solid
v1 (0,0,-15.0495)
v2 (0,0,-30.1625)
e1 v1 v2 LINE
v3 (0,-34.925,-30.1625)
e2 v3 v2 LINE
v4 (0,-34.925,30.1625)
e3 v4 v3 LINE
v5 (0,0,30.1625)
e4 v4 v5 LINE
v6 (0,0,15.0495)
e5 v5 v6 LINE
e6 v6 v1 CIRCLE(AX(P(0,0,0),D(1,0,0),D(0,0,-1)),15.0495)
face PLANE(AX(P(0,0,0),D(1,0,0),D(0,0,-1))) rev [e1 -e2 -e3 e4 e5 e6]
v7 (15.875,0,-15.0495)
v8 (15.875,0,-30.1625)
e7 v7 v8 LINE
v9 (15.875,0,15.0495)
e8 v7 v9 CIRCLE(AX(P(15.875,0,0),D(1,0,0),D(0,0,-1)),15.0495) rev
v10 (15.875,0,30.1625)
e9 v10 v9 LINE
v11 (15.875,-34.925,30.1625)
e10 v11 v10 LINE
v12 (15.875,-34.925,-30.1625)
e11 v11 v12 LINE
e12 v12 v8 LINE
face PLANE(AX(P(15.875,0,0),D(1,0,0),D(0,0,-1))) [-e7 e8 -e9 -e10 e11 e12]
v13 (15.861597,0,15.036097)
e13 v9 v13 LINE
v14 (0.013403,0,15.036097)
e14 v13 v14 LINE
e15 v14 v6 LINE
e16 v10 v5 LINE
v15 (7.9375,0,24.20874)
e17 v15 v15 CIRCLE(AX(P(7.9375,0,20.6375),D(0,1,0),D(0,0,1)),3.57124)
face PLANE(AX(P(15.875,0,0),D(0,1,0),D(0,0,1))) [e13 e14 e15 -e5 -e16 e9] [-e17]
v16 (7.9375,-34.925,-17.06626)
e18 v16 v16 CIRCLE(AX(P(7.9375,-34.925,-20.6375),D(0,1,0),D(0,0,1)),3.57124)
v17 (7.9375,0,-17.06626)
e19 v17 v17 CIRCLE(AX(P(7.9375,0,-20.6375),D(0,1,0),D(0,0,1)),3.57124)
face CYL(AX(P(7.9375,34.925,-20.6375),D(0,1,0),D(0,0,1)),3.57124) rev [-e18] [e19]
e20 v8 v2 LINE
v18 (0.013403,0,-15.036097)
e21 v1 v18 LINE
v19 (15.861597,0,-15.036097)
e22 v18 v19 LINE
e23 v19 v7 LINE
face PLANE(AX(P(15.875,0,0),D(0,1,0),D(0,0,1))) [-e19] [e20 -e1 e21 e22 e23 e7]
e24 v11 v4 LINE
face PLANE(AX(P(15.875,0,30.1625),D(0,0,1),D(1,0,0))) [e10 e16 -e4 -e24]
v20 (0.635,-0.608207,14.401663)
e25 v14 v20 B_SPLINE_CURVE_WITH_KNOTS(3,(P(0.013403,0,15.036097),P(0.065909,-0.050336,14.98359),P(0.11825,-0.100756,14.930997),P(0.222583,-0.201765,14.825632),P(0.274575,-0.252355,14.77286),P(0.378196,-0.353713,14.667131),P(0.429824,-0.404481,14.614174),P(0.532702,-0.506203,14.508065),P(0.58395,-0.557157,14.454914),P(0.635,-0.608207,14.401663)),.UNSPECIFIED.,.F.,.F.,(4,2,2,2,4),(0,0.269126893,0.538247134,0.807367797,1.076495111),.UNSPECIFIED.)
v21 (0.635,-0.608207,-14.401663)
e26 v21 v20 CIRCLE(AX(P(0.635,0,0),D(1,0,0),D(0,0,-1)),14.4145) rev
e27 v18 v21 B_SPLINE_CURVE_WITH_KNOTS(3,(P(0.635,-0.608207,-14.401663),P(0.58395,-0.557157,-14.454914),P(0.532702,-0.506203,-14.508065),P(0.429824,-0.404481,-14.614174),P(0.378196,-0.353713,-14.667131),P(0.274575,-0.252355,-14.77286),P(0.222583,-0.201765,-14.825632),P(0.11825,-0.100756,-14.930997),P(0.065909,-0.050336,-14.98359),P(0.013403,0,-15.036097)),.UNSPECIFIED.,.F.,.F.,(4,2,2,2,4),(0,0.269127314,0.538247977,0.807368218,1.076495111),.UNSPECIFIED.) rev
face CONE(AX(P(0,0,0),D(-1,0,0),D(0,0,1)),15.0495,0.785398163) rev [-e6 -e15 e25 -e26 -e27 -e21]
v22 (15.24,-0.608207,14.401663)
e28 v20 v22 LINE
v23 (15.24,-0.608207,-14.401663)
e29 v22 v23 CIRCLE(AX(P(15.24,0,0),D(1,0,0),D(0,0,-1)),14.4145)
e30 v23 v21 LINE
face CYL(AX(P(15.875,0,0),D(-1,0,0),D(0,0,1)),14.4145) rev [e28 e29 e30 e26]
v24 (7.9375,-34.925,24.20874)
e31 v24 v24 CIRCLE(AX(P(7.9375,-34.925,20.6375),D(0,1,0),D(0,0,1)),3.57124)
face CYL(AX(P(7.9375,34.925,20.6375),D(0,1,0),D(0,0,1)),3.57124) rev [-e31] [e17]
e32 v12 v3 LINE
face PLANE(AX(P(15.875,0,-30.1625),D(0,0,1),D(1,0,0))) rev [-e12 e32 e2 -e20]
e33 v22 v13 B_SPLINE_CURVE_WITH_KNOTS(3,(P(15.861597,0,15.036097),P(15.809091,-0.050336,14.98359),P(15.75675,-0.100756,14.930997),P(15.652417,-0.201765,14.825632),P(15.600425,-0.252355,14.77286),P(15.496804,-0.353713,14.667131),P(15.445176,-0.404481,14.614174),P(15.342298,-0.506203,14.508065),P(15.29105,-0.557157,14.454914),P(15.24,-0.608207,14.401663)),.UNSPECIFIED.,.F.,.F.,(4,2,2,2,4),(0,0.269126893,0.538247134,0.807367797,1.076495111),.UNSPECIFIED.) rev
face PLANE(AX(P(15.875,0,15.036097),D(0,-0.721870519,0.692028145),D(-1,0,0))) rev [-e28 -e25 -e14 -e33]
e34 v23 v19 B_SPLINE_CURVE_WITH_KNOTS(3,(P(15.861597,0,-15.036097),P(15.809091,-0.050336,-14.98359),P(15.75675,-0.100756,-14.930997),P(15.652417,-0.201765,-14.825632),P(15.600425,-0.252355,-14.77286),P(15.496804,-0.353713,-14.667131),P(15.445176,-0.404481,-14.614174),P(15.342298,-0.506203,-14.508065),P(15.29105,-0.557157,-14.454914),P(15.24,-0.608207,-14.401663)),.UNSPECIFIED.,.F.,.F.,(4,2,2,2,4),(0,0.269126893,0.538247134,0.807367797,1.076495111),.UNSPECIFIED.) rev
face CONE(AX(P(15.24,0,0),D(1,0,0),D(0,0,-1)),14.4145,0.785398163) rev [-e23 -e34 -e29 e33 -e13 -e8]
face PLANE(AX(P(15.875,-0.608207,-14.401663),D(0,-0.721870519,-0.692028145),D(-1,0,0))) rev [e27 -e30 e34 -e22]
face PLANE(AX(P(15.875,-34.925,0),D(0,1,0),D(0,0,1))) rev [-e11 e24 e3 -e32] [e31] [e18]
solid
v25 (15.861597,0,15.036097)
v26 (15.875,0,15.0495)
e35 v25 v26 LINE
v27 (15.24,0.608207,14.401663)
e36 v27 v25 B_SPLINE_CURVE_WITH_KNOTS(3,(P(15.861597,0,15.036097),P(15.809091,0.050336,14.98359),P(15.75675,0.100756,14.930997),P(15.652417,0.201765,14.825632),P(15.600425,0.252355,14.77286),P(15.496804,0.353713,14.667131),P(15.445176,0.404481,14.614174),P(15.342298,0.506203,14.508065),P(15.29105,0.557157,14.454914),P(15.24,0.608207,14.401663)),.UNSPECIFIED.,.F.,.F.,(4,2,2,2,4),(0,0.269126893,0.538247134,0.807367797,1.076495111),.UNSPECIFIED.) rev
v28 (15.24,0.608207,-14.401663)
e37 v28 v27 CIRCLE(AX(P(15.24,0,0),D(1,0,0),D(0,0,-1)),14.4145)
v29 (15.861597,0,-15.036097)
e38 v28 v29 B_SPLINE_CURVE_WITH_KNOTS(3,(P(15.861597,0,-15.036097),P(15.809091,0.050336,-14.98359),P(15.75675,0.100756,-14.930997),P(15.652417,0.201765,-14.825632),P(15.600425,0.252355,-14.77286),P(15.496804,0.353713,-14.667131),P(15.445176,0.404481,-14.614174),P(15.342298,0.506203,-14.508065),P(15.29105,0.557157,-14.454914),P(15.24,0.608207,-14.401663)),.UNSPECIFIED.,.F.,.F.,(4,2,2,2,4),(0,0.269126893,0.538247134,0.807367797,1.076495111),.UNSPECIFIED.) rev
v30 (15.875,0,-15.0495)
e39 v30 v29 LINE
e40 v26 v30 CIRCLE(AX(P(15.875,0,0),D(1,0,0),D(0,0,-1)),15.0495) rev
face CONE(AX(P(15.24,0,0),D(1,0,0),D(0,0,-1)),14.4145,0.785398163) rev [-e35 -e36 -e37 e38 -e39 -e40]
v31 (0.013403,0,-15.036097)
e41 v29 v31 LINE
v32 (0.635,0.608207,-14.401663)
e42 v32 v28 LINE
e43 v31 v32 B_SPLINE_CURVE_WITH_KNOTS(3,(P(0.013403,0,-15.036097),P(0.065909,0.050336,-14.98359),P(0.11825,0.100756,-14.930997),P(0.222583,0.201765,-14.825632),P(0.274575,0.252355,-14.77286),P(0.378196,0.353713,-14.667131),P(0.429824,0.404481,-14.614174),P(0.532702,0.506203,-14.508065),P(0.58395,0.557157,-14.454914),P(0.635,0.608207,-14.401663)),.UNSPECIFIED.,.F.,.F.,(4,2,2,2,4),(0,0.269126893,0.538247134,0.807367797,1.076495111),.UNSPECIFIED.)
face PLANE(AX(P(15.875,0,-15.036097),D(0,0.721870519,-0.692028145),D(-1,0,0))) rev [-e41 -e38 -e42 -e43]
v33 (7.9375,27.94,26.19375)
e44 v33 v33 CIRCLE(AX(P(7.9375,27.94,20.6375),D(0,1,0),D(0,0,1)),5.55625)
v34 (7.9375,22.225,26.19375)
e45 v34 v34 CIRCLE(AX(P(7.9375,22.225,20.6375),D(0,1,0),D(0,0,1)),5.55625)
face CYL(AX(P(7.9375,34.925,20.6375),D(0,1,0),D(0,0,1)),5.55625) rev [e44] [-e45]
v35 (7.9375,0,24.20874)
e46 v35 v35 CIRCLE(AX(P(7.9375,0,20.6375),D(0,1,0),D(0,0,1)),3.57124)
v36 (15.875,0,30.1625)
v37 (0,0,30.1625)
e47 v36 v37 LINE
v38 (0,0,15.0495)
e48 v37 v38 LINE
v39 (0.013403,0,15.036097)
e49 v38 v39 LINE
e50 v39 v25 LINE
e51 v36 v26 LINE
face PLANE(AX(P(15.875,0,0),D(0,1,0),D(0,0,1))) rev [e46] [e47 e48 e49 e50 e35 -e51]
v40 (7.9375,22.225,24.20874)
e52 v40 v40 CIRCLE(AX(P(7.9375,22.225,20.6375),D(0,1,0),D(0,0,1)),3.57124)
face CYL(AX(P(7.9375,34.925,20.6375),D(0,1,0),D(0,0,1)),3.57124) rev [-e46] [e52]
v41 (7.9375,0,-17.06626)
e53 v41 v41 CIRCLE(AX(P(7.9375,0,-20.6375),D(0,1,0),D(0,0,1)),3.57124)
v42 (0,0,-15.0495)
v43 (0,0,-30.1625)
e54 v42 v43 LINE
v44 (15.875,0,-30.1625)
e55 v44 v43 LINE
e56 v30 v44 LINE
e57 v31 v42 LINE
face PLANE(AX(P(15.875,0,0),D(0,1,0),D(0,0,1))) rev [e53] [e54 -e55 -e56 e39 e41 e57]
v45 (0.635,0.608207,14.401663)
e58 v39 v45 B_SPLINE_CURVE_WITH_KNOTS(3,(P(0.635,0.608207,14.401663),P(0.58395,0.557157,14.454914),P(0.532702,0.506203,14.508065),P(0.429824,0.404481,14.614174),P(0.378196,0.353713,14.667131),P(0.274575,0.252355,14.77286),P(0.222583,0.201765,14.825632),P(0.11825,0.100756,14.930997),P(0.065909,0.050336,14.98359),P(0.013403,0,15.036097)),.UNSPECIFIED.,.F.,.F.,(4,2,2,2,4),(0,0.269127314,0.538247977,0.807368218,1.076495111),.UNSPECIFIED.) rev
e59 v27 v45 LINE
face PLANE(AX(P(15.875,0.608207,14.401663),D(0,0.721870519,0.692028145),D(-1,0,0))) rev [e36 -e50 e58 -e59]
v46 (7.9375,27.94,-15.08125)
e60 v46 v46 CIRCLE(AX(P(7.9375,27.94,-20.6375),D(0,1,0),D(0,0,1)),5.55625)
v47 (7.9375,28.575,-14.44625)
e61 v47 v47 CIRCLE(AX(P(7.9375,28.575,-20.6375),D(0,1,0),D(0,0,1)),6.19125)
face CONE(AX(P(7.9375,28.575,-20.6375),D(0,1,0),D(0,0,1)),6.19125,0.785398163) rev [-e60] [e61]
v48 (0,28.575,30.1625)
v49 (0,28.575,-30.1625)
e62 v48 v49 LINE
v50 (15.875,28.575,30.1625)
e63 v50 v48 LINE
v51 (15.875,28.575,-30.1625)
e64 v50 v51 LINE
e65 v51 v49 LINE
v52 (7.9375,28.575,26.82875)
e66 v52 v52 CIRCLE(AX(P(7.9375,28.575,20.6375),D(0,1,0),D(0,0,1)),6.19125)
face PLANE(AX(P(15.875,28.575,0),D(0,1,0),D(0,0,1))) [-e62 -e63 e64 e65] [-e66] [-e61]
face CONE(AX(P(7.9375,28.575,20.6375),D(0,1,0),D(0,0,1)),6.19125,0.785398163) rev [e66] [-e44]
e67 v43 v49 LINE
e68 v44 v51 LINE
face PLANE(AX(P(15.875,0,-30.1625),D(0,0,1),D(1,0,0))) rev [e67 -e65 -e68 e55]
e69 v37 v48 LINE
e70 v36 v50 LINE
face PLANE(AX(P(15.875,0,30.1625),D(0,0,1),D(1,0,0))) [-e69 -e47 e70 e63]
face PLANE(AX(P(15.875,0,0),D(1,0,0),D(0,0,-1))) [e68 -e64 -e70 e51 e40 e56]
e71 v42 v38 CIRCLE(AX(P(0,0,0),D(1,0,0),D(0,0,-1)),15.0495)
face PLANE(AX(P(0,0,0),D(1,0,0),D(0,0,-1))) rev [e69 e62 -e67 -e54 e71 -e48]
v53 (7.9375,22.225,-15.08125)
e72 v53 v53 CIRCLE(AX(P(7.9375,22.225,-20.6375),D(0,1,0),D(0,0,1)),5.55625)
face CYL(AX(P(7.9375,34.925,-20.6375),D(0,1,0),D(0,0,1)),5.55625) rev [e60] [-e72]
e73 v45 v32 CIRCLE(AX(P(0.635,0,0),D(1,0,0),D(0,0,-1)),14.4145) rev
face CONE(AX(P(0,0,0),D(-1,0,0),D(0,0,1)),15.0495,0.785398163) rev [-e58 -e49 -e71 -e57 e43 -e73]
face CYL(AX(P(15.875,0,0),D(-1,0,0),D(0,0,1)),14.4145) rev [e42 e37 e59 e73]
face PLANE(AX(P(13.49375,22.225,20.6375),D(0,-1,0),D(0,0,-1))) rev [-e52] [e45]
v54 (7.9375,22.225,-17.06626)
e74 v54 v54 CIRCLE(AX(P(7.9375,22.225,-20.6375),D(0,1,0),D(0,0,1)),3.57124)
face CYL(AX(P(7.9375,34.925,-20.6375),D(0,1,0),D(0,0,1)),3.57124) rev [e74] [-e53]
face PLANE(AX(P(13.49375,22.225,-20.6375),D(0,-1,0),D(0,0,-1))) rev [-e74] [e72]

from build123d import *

# Parameters (mm, degrees)
BOSS_EXTRUDE1_DEPTH                           = 15.875
BOSS_EXTRUDE2_DEPTH                           = 15.875
CBORE_FOR_1_4_SOCKET_HEAD_CAP_SCREW1_AT_COUNT = 2
CBORE_FOR_1_4_SOCKET_HEAD_CAP_SCREW1_AT_PITCH = 41.275
MOVE_FACE1_BY                                 = 0.127
MOVE_FACE1_2_BY                               = 0.127
MOVE_START                                    = 28.575
MOVE_FACE2_OUTLINE_W                          = 15.875
MOVE_FACE2_OUTLINE_H                          = 60.325
MOVE_FACE2_OUTLINE_R                          = 5.55625
MOVE_FACE2_DEPTH                              = 6.35
MOVE_START_2                                  = 22.225
MOVE_FACE2_2_OUTLINE_R                        = 5.55625
MOVE_FACE2_2_OUTLINE_R_2                      = 3.57124
MOVE_FACE2_2_DEPTH                            = 6.35


with BuildPart() as part:
    # Sketch1 → Boss-Extrude1 (new body)
    with BuildSketch(Plane(origin=(0, 0, 0), x_dir=(0, 0, -1), z_dir=(1, 0, 0))):
        with BuildLine():
            Line((30.1625, 0), (14.2875, 0))
            ThreePointArc((14.2875, 0), (0, -14.2875), (-14.2875, 0))
            Line((-14.2875, 0), (-30.1625, 0))
            Line((-30.1625, 0), (-30.1625, -34.925))
            Line((-30.1625, -34.925), (30.1625, -34.925))
            Line((30.1625, -34.925), (30.1625, 0))
        make_face()
    extrude(amount=BOSS_EXTRUDE1_DEPTH)


with BuildPart() as body_2:
    # Sketch1<3> → Boss-Extrude2 (new body)
    with BuildSketch(Plane(origin=(0, 0, 0), x_dir=(0, 0, -1), z_dir=(1, 0, 0))):
        with BuildLine():
            ThreePointArc((-14.2875, 0), (0, 14.2875), (14.2875, 0))
            Line((14.2875, 0), (30.1625, 0))
            Line((30.1625, 0), (30.1625, 34.925))
            Line((30.1625, 34.925), (-30.1625, 34.925))
            Line((-30.1625, 34.925), (-30.1625, 0))
            Line((-30.1625, 0), (-14.2875, 0))
        make_face()
    extrude(amount=BOSS_EXTRUDE2_DEPTH)


with BuildPart() as cbore_for_1_4_socket_head_cap_screw1_tool:
    # Sketch4 → CBORE for 1/4 Socket Head Cap Screw1 (revolve)
    with BuildSketch(Plane(origin=(7.9375, 34.925, 20.6375), x_dir=(0, 0, 1), z_dir=(1, 0, 0))):
        Polygon((0, 0), (0, 69.85), (3.57124, 69.85), (3.57124, 6.35), (5.55625, 6.35), (5.55625, 0.635), (6.19125, 0), align=None)
    cbore_for_1_4_socket_head_cap_screw1 = revolve(axis=Axis((7.9375, 41.275, 20.6375), (0, -1, 0)))


with BuildPart() as part_1:
    add(part.part)

    # CBORE for 1/4 Socket Head Cap Screw1: cut by cbore_for_1_4_socket_head_cap_screw1_tool
    add(cbore_for_1_4_socket_head_cap_screw1_tool.part, mode=Mode.SUBTRACT)


with BuildPart() as body_2_1:
    add(body_2.part)

    # CBORE for 1/4 Socket Head Cap Screw1: cut by cbore_for_1_4_socket_head_cap_screw1_tool
    add(cbore_for_1_4_socket_head_cap_screw1_tool.part, mode=Mode.SUBTRACT)


with BuildPart() as cbore_for_1_4_socket_head_cap_screw1_at_tool:
    # CBORE for 1/4 Socket Head Cap Screw1 at: CBORE for 1/4 Socket Head Cap Screw1 ×2
    with Locations(*[(0, 0, -i * CBORE_FOR_1_4_SOCKET_HEAD_CAP_SCREW1_AT_PITCH) for i in range(1, CBORE_FOR_1_4_SOCKET_HEAD_CAP_SCREW1_AT_COUNT)]):
        add(cbore_for_1_4_socket_head_cap_screw1)


with BuildPart() as part_2:
    add(part_1.part)

    # CBORE for 1/4 Socket Head Cap Screw1 at: cut by cbore_for_1_4_socket_head_cap_screw1_at_tool
    add(cbore_for_1_4_socket_head_cap_screw1_at_tool.part, mode=Mode.SUBTRACT)

    # Move Face1 2: a curved face moved inward by 0.127
    add(Solid.thicken(part_2.faces().sort_by_distance((7.9375, -14.2875, 0))[0], -MOVE_FACE1_2_BY), mode=Mode.SUBTRACT)

    # Chamfer2
    # the kernel refuses this chamfer: 0.635 mm, written as the material it takes off along each edge
    with BuildSketch(Plane(origin=(0, 0, 0), x_dir=(0, 0.1132288377802066, -0.9935689358544497), z_dir=(0, 0.9935689358544497, 0.1132288377802066))) as chamfer2_piece_1:
        with BuildLine():
            Line((15.067460512, 0.017960512), (14.396539488, -0.652960512))
            Line((14.396539488, -0.652960512), (14.383839488, -0.652960512))
            ThreePointArc((14.383839488, -0.652960512), (14.4018, -0.326480256), (14.4018, 0))
            Line((14.4018, 0), (14.4145, 0.0127))
            ThreePointArc((14.4145, 0.0127), (14.740980256, 0.0127), (15.067460512, 0.030660512))
            Line((15.067460512, 0.030660512), (15.067460512, 0.017960512))
        make_face()
    revolve(axis=Axis((0, 0, 0), (-1, 0, 0)), revolution_arc=193.002955297, mode=Mode.SUBTRACT)
    with BuildSketch(Plane(origin=(-1.600435701, 0, -14.4145), x_dir=(0, 0, -1), z_dir=(1, 0, 0))) as chamfer2_piece_2:
        with BuildLine():
            Line((0.639932919, 0.017577515), (-0.031172593, -0.625784266))
            Line((-0.031172593, -0.625784266), (-0.043861283, -0.625248401))
            ThreePointArc((-0.043861283, -0.625248401), (-0.016099091, -0.31288099), (-0.0127, 0))
            Line((-0.0127, 0), (0, 0.0127))
            ThreePointArc((0, 0.0127), (0.319966459, 0.0127), (0.639932919, 0.030277515))
            Line((0.639932919, 0.030277515), (0.639932919, 0.017577515))
        make_face()
    extrude(amount=19.075871403, mode=Mode.SUBTRACT)
    with BuildSketch(Plane(origin=(-1.600435701, 0, 14.4145), x_dir=(0, -0.999777333387341, -0.021101745067597762), z_dir=(1, 0, 0))) as chamfer2_piece_3:
        with BuildLine():
            Line((0.626302721, 0.017960512), (-0.031077302, -0.639419511))
            Line((-0.031077302, -0.639419511), (-0.043774474, -0.639151519))
            ThreePointArc((-0.043774474, -0.639151519), (-0.019449023, -0.319627221), (-0.012697172, 0.000267992))
            Line((-0.012697172, 0.000267992), (0.000267992, 0.012697172))
            ThreePointArc((0.000267992, 0.012697172), (0.313151041, 0.009493172), (0.626034729, 0.030657684))
            Line((0.626034729, 0.030657684), (0.626302721, 0.017960512))
        make_face()
    extrude(amount=19.075871403, mode=Mode.SUBTRACT)
    with BuildSketch(Plane(origin=(15.875, 0, 0), x_dir=(0, 0.11322883778020662, -0.9935689358544497), z_dir=(0, 0.9935689358544497, 0.11322883778020662))) as chamfer2_piece_4:
        with BuildLine():
            Line((14.396539488, 0.652960512), (15.067460512, -0.017960512))
            Line((15.067460512, -0.017960512), (15.067460512, -0.030660512))
            ThreePointArc((15.067460512, -0.030660512), (14.740980256, -0.0127), (14.4145, -0.0127))
            Line((14.4145, -0.0127), (14.4018, 0))
            ThreePointArc((14.4018, 0), (14.4018, 0.326480256), (14.383839488, 0.652960512))
            Line((14.383839488, 0.652960512), (14.396539488, 0.652960512))
        make_face()
    revolve(axis=Axis((15.875, 0, 0), (-1, 0, 0)), revolution_arc=193.002955297, mode=Mode.SUBTRACT)


with BuildPart() as body_2_2:
    add(body_2_1.part)

    # CBORE for 1/4 Socket Head Cap Screw1 at: cut by cbore_for_1_4_socket_head_cap_screw1_at_tool
    add(cbore_for_1_4_socket_head_cap_screw1_at_tool.part, mode=Mode.SUBTRACT)

    # Move Face1: a curved face moved inward by 0.127
    add(Solid.thicken(body_2_2.faces().sort_by_distance((7.9375, 14.2875, 0))[0], -MOVE_FACE1_BY), mode=Mode.SUBTRACT)

    # Move Face2: read off the stored shape, not the designer's step
    # Move Face2 outline → Move Face2 (cut)
    with BuildSketch(Plane(origin=(0, 0, 0), x_dir=(1, 0, 0), z_dir=(0, 1, 0)).offset(MOVE_START)):
        with Locations((7.9375, 0)):
            Rectangle(MOVE_FACE2_OUTLINE_W, MOVE_FACE2_OUTLINE_H)
        with Locations((7.9375, -20.6375)):
            Circle(MOVE_FACE2_OUTLINE_R, mode=Mode.SUBTRACT)
        with Locations((7.9375, 20.6375)):
            Circle(MOVE_FACE2_OUTLINE_R, mode=Mode.SUBTRACT)
    extrude(amount=MOVE_FACE2_DEPTH, mode=Mode.SUBTRACT)

    # Move Face2 2 outline → Move Face2 2 (cut)
    # profile 1 of 2: a face of its own
    with BuildSketch(Plane(origin=(0, 0, 0), x_dir=(1, 0, 0), z_dir=(0, 1, 0)).offset(MOVE_START_2)):
        with Locations((7.9375, 20.6375)):
            Circle(MOVE_FACE2_2_OUTLINE_R)
        with Locations((7.9375, 20.6375)):
            Circle(MOVE_FACE2_2_OUTLINE_R_2, mode=Mode.SUBTRACT)
    # profile 2 of 2: a face of its own
    with BuildSketch(Plane(origin=(0, 0, 0), x_dir=(1, 0, 0), z_dir=(0, 1, 0)).offset(MOVE_START_2)):
        with Locations((7.9375, -20.6375)):
            Circle(MOVE_FACE2_2_OUTLINE_R)
        with Locations((7.9375, -20.6375)):
            Circle(MOVE_FACE2_2_OUTLINE_R_2, mode=Mode.SUBTRACT)
    extrude(amount=MOVE_FACE2_2_DEPTH, mode=Mode.SUBTRACT)

    # Move Face2 3: loft between two sections, ruled curve by curve
    move_face2_3_from = [
        Edge.make_three_point_arc((7.9375, 27.94, -15.08125), (13.49375, 27.94, -20.6375), (7.9375, 27.94, -26.19375)),
        Edge.make_three_point_arc((7.9375, 27.94, -26.19375), (2.38125, 27.94, -20.6375), (7.9375, 27.94, -15.08125)),
    ]
    move_face2_3_to = [
        Edge.make_three_point_arc((7.9375, 28.575, -14.44625), (14.12875, 28.575, -20.6375), (7.9375, 28.575, -26.82875)),
        Edge.make_three_point_arc((7.9375, 28.575, -26.82875), (1.74625, 28.575, -20.6375), (7.9375, 28.575, -14.44625)),
    ]
    move_face2_3 = Solid(Shell([*[Face.make_surface_from_curves(move_face2_3_from[k], move_face2_3_to[k]) for k in range(2)], Face(Wire(move_face2_3_from)), Face(Wire(move_face2_3_to))]))
    add(move_face2_3, mode=Mode.SUBTRACT)

    # Move Face2 4: loft between two sections, ruled curve by curve
    move_face2_4_from = [
        Edge.make_three_point_arc((7.9375, 27.94, 26.19375), (13.49375, 27.94, 20.6375), (7.9375, 27.94, 15.08125)),
        Edge.make_three_point_arc((7.9375, 27.94, 15.08125), (2.38125, 27.94, 20.6375), (7.9375, 27.94, 26.19375)),
    ]
    move_face2_4_to = [
        Edge.make_three_point_arc((7.9375, 28.575, 26.82875), (14.12875, 28.575, 20.6375), (7.9375, 28.575, 14.44625)),
        Edge.make_three_point_arc((7.9375, 28.575, 14.44625), (1.74625, 28.575, 20.6375), (7.9375, 28.575, 26.82875)),
    ]
    move_face2_4 = Solid(Shell([*[Face.make_surface_from_curves(move_face2_4_from[k], move_face2_4_to[k]) for k in range(2)], Face(Wire(move_face2_4_from)), Face(Wire(move_face2_4_to))]))
    add(move_face2_4, mode=Mode.SUBTRACT)

    # Chamfer1
    # the kernel refuses this chamfer: 0.635 mm, written as the material it takes off along each edge
    with BuildSketch(Plane(origin=(0, 0, 0), x_dir=(0, -0.11322883778020673, 0.9935689358544497), z_dir=(0, -0.9935689358544497, -0.11322883778020673))) as chamfer1_piece_1:
        with BuildLine():
            Line((15.067460512, 0.017960512), (14.396539488, -0.652960512))
            Line((14.396539488, -0.652960512), (14.383839488, -0.652960512))
            ThreePointArc((14.383839488, -0.652960512), (14.4018, -0.326480256), (14.4018, 0))
            Line((14.4018, 0), (14.4145, 0.0127))
            ThreePointArc((14.4145, 0.0127), (14.740980256, 0.0127), (15.067460512, 0.030660512))
            Line((15.067460512, 0.030660512), (15.067460512, 0.017960512))
        make_face()
    revolve(axis=Axis((0, 0, 0), (-1, 0, 0)), revolution_arc=193.002955297, mode=Mode.SUBTRACT)
    with BuildSketch(Plane(origin=(-1.600435701, 0, 14.4145), x_dir=(0, 0, 1), z_dir=(1, 0, 0))) as chamfer1_piece_2:
        with BuildLine():
            Line((0.639932919, 0.017577515), (-0.031172593, -0.625784266))
            Line((-0.031172593, -0.625784266), (-0.043861283, -0.625248401))
            ThreePointArc((-0.043861283, -0.625248401), (-0.016099091, -0.31288099), (-0.0127, 0))
            Line((-0.0127, 0), (0, 0.0127))
            ThreePointArc((0, 0.0127), (0.319966459, 0.0127), (0.639932919, 0.030277515))
            Line((0.639932919, 0.030277515), (0.639932919, 0.017577515))
        make_face()
    extrude(amount=19.075871403, mode=Mode.SUBTRACT)
    with BuildSketch(Plane(origin=(-1.600435701, 0, -14.4145), x_dir=(0, 0.999777333387341, 0.021101745067597762), z_dir=(1, 0, 0))) as chamfer1_piece_3:
        with BuildLine():
            Line((0.626302721, 0.017960512), (-0.031077302, -0.639419511))
            Line((-0.031077302, -0.639419511), (-0.043774474, -0.639151519))
            ThreePointArc((-0.043774474, -0.639151519), (-0.019449023, -0.319627221), (-0.012697172, 0.000267992))
            Line((-0.012697172, 0.000267992), (0.000267992, 0.012697172))
            ThreePointArc((0.000267992, 0.012697172), (0.313151041, 0.009493172), (0.626034729, 0.030657684))
            Line((0.626034729, 0.030657684), (0.626302721, 0.017960512))
        make_face()
    extrude(amount=19.075871403, mode=Mode.SUBTRACT)
    with BuildSketch(Plane(origin=(15.875, 0, 0), x_dir=(0, -0.11322883778020675, 0.9935689358544497), z_dir=(0, -0.9935689358544497, -0.11322883778020675))) as chamfer1_piece_4:
        with BuildLine():
            Line((14.396539488, 0.652960512), (15.067460512, -0.017960512))
            Line((15.067460512, -0.017960512), (15.067460512, -0.030660512))
            ThreePointArc((15.067460512, -0.030660512), (14.740980256, -0.0127), (14.4145, -0.0127))
            Line((14.4145, -0.0127), (14.4018, 0))
            ThreePointArc((14.4018, 0), (14.4018, 0.326480256), (14.383839488, 0.652960512))
            Line((14.383839488, 0.652960512), (14.396539488, 0.652960512))
        make_face()
    revolve(axis=Axis((15.875, 0, 0), (-1, 0, 0)), revolution_arc=193.002955297, mode=Mode.SUBTRACT)


solid = Compound([part_2.part, body_2_2.part])
